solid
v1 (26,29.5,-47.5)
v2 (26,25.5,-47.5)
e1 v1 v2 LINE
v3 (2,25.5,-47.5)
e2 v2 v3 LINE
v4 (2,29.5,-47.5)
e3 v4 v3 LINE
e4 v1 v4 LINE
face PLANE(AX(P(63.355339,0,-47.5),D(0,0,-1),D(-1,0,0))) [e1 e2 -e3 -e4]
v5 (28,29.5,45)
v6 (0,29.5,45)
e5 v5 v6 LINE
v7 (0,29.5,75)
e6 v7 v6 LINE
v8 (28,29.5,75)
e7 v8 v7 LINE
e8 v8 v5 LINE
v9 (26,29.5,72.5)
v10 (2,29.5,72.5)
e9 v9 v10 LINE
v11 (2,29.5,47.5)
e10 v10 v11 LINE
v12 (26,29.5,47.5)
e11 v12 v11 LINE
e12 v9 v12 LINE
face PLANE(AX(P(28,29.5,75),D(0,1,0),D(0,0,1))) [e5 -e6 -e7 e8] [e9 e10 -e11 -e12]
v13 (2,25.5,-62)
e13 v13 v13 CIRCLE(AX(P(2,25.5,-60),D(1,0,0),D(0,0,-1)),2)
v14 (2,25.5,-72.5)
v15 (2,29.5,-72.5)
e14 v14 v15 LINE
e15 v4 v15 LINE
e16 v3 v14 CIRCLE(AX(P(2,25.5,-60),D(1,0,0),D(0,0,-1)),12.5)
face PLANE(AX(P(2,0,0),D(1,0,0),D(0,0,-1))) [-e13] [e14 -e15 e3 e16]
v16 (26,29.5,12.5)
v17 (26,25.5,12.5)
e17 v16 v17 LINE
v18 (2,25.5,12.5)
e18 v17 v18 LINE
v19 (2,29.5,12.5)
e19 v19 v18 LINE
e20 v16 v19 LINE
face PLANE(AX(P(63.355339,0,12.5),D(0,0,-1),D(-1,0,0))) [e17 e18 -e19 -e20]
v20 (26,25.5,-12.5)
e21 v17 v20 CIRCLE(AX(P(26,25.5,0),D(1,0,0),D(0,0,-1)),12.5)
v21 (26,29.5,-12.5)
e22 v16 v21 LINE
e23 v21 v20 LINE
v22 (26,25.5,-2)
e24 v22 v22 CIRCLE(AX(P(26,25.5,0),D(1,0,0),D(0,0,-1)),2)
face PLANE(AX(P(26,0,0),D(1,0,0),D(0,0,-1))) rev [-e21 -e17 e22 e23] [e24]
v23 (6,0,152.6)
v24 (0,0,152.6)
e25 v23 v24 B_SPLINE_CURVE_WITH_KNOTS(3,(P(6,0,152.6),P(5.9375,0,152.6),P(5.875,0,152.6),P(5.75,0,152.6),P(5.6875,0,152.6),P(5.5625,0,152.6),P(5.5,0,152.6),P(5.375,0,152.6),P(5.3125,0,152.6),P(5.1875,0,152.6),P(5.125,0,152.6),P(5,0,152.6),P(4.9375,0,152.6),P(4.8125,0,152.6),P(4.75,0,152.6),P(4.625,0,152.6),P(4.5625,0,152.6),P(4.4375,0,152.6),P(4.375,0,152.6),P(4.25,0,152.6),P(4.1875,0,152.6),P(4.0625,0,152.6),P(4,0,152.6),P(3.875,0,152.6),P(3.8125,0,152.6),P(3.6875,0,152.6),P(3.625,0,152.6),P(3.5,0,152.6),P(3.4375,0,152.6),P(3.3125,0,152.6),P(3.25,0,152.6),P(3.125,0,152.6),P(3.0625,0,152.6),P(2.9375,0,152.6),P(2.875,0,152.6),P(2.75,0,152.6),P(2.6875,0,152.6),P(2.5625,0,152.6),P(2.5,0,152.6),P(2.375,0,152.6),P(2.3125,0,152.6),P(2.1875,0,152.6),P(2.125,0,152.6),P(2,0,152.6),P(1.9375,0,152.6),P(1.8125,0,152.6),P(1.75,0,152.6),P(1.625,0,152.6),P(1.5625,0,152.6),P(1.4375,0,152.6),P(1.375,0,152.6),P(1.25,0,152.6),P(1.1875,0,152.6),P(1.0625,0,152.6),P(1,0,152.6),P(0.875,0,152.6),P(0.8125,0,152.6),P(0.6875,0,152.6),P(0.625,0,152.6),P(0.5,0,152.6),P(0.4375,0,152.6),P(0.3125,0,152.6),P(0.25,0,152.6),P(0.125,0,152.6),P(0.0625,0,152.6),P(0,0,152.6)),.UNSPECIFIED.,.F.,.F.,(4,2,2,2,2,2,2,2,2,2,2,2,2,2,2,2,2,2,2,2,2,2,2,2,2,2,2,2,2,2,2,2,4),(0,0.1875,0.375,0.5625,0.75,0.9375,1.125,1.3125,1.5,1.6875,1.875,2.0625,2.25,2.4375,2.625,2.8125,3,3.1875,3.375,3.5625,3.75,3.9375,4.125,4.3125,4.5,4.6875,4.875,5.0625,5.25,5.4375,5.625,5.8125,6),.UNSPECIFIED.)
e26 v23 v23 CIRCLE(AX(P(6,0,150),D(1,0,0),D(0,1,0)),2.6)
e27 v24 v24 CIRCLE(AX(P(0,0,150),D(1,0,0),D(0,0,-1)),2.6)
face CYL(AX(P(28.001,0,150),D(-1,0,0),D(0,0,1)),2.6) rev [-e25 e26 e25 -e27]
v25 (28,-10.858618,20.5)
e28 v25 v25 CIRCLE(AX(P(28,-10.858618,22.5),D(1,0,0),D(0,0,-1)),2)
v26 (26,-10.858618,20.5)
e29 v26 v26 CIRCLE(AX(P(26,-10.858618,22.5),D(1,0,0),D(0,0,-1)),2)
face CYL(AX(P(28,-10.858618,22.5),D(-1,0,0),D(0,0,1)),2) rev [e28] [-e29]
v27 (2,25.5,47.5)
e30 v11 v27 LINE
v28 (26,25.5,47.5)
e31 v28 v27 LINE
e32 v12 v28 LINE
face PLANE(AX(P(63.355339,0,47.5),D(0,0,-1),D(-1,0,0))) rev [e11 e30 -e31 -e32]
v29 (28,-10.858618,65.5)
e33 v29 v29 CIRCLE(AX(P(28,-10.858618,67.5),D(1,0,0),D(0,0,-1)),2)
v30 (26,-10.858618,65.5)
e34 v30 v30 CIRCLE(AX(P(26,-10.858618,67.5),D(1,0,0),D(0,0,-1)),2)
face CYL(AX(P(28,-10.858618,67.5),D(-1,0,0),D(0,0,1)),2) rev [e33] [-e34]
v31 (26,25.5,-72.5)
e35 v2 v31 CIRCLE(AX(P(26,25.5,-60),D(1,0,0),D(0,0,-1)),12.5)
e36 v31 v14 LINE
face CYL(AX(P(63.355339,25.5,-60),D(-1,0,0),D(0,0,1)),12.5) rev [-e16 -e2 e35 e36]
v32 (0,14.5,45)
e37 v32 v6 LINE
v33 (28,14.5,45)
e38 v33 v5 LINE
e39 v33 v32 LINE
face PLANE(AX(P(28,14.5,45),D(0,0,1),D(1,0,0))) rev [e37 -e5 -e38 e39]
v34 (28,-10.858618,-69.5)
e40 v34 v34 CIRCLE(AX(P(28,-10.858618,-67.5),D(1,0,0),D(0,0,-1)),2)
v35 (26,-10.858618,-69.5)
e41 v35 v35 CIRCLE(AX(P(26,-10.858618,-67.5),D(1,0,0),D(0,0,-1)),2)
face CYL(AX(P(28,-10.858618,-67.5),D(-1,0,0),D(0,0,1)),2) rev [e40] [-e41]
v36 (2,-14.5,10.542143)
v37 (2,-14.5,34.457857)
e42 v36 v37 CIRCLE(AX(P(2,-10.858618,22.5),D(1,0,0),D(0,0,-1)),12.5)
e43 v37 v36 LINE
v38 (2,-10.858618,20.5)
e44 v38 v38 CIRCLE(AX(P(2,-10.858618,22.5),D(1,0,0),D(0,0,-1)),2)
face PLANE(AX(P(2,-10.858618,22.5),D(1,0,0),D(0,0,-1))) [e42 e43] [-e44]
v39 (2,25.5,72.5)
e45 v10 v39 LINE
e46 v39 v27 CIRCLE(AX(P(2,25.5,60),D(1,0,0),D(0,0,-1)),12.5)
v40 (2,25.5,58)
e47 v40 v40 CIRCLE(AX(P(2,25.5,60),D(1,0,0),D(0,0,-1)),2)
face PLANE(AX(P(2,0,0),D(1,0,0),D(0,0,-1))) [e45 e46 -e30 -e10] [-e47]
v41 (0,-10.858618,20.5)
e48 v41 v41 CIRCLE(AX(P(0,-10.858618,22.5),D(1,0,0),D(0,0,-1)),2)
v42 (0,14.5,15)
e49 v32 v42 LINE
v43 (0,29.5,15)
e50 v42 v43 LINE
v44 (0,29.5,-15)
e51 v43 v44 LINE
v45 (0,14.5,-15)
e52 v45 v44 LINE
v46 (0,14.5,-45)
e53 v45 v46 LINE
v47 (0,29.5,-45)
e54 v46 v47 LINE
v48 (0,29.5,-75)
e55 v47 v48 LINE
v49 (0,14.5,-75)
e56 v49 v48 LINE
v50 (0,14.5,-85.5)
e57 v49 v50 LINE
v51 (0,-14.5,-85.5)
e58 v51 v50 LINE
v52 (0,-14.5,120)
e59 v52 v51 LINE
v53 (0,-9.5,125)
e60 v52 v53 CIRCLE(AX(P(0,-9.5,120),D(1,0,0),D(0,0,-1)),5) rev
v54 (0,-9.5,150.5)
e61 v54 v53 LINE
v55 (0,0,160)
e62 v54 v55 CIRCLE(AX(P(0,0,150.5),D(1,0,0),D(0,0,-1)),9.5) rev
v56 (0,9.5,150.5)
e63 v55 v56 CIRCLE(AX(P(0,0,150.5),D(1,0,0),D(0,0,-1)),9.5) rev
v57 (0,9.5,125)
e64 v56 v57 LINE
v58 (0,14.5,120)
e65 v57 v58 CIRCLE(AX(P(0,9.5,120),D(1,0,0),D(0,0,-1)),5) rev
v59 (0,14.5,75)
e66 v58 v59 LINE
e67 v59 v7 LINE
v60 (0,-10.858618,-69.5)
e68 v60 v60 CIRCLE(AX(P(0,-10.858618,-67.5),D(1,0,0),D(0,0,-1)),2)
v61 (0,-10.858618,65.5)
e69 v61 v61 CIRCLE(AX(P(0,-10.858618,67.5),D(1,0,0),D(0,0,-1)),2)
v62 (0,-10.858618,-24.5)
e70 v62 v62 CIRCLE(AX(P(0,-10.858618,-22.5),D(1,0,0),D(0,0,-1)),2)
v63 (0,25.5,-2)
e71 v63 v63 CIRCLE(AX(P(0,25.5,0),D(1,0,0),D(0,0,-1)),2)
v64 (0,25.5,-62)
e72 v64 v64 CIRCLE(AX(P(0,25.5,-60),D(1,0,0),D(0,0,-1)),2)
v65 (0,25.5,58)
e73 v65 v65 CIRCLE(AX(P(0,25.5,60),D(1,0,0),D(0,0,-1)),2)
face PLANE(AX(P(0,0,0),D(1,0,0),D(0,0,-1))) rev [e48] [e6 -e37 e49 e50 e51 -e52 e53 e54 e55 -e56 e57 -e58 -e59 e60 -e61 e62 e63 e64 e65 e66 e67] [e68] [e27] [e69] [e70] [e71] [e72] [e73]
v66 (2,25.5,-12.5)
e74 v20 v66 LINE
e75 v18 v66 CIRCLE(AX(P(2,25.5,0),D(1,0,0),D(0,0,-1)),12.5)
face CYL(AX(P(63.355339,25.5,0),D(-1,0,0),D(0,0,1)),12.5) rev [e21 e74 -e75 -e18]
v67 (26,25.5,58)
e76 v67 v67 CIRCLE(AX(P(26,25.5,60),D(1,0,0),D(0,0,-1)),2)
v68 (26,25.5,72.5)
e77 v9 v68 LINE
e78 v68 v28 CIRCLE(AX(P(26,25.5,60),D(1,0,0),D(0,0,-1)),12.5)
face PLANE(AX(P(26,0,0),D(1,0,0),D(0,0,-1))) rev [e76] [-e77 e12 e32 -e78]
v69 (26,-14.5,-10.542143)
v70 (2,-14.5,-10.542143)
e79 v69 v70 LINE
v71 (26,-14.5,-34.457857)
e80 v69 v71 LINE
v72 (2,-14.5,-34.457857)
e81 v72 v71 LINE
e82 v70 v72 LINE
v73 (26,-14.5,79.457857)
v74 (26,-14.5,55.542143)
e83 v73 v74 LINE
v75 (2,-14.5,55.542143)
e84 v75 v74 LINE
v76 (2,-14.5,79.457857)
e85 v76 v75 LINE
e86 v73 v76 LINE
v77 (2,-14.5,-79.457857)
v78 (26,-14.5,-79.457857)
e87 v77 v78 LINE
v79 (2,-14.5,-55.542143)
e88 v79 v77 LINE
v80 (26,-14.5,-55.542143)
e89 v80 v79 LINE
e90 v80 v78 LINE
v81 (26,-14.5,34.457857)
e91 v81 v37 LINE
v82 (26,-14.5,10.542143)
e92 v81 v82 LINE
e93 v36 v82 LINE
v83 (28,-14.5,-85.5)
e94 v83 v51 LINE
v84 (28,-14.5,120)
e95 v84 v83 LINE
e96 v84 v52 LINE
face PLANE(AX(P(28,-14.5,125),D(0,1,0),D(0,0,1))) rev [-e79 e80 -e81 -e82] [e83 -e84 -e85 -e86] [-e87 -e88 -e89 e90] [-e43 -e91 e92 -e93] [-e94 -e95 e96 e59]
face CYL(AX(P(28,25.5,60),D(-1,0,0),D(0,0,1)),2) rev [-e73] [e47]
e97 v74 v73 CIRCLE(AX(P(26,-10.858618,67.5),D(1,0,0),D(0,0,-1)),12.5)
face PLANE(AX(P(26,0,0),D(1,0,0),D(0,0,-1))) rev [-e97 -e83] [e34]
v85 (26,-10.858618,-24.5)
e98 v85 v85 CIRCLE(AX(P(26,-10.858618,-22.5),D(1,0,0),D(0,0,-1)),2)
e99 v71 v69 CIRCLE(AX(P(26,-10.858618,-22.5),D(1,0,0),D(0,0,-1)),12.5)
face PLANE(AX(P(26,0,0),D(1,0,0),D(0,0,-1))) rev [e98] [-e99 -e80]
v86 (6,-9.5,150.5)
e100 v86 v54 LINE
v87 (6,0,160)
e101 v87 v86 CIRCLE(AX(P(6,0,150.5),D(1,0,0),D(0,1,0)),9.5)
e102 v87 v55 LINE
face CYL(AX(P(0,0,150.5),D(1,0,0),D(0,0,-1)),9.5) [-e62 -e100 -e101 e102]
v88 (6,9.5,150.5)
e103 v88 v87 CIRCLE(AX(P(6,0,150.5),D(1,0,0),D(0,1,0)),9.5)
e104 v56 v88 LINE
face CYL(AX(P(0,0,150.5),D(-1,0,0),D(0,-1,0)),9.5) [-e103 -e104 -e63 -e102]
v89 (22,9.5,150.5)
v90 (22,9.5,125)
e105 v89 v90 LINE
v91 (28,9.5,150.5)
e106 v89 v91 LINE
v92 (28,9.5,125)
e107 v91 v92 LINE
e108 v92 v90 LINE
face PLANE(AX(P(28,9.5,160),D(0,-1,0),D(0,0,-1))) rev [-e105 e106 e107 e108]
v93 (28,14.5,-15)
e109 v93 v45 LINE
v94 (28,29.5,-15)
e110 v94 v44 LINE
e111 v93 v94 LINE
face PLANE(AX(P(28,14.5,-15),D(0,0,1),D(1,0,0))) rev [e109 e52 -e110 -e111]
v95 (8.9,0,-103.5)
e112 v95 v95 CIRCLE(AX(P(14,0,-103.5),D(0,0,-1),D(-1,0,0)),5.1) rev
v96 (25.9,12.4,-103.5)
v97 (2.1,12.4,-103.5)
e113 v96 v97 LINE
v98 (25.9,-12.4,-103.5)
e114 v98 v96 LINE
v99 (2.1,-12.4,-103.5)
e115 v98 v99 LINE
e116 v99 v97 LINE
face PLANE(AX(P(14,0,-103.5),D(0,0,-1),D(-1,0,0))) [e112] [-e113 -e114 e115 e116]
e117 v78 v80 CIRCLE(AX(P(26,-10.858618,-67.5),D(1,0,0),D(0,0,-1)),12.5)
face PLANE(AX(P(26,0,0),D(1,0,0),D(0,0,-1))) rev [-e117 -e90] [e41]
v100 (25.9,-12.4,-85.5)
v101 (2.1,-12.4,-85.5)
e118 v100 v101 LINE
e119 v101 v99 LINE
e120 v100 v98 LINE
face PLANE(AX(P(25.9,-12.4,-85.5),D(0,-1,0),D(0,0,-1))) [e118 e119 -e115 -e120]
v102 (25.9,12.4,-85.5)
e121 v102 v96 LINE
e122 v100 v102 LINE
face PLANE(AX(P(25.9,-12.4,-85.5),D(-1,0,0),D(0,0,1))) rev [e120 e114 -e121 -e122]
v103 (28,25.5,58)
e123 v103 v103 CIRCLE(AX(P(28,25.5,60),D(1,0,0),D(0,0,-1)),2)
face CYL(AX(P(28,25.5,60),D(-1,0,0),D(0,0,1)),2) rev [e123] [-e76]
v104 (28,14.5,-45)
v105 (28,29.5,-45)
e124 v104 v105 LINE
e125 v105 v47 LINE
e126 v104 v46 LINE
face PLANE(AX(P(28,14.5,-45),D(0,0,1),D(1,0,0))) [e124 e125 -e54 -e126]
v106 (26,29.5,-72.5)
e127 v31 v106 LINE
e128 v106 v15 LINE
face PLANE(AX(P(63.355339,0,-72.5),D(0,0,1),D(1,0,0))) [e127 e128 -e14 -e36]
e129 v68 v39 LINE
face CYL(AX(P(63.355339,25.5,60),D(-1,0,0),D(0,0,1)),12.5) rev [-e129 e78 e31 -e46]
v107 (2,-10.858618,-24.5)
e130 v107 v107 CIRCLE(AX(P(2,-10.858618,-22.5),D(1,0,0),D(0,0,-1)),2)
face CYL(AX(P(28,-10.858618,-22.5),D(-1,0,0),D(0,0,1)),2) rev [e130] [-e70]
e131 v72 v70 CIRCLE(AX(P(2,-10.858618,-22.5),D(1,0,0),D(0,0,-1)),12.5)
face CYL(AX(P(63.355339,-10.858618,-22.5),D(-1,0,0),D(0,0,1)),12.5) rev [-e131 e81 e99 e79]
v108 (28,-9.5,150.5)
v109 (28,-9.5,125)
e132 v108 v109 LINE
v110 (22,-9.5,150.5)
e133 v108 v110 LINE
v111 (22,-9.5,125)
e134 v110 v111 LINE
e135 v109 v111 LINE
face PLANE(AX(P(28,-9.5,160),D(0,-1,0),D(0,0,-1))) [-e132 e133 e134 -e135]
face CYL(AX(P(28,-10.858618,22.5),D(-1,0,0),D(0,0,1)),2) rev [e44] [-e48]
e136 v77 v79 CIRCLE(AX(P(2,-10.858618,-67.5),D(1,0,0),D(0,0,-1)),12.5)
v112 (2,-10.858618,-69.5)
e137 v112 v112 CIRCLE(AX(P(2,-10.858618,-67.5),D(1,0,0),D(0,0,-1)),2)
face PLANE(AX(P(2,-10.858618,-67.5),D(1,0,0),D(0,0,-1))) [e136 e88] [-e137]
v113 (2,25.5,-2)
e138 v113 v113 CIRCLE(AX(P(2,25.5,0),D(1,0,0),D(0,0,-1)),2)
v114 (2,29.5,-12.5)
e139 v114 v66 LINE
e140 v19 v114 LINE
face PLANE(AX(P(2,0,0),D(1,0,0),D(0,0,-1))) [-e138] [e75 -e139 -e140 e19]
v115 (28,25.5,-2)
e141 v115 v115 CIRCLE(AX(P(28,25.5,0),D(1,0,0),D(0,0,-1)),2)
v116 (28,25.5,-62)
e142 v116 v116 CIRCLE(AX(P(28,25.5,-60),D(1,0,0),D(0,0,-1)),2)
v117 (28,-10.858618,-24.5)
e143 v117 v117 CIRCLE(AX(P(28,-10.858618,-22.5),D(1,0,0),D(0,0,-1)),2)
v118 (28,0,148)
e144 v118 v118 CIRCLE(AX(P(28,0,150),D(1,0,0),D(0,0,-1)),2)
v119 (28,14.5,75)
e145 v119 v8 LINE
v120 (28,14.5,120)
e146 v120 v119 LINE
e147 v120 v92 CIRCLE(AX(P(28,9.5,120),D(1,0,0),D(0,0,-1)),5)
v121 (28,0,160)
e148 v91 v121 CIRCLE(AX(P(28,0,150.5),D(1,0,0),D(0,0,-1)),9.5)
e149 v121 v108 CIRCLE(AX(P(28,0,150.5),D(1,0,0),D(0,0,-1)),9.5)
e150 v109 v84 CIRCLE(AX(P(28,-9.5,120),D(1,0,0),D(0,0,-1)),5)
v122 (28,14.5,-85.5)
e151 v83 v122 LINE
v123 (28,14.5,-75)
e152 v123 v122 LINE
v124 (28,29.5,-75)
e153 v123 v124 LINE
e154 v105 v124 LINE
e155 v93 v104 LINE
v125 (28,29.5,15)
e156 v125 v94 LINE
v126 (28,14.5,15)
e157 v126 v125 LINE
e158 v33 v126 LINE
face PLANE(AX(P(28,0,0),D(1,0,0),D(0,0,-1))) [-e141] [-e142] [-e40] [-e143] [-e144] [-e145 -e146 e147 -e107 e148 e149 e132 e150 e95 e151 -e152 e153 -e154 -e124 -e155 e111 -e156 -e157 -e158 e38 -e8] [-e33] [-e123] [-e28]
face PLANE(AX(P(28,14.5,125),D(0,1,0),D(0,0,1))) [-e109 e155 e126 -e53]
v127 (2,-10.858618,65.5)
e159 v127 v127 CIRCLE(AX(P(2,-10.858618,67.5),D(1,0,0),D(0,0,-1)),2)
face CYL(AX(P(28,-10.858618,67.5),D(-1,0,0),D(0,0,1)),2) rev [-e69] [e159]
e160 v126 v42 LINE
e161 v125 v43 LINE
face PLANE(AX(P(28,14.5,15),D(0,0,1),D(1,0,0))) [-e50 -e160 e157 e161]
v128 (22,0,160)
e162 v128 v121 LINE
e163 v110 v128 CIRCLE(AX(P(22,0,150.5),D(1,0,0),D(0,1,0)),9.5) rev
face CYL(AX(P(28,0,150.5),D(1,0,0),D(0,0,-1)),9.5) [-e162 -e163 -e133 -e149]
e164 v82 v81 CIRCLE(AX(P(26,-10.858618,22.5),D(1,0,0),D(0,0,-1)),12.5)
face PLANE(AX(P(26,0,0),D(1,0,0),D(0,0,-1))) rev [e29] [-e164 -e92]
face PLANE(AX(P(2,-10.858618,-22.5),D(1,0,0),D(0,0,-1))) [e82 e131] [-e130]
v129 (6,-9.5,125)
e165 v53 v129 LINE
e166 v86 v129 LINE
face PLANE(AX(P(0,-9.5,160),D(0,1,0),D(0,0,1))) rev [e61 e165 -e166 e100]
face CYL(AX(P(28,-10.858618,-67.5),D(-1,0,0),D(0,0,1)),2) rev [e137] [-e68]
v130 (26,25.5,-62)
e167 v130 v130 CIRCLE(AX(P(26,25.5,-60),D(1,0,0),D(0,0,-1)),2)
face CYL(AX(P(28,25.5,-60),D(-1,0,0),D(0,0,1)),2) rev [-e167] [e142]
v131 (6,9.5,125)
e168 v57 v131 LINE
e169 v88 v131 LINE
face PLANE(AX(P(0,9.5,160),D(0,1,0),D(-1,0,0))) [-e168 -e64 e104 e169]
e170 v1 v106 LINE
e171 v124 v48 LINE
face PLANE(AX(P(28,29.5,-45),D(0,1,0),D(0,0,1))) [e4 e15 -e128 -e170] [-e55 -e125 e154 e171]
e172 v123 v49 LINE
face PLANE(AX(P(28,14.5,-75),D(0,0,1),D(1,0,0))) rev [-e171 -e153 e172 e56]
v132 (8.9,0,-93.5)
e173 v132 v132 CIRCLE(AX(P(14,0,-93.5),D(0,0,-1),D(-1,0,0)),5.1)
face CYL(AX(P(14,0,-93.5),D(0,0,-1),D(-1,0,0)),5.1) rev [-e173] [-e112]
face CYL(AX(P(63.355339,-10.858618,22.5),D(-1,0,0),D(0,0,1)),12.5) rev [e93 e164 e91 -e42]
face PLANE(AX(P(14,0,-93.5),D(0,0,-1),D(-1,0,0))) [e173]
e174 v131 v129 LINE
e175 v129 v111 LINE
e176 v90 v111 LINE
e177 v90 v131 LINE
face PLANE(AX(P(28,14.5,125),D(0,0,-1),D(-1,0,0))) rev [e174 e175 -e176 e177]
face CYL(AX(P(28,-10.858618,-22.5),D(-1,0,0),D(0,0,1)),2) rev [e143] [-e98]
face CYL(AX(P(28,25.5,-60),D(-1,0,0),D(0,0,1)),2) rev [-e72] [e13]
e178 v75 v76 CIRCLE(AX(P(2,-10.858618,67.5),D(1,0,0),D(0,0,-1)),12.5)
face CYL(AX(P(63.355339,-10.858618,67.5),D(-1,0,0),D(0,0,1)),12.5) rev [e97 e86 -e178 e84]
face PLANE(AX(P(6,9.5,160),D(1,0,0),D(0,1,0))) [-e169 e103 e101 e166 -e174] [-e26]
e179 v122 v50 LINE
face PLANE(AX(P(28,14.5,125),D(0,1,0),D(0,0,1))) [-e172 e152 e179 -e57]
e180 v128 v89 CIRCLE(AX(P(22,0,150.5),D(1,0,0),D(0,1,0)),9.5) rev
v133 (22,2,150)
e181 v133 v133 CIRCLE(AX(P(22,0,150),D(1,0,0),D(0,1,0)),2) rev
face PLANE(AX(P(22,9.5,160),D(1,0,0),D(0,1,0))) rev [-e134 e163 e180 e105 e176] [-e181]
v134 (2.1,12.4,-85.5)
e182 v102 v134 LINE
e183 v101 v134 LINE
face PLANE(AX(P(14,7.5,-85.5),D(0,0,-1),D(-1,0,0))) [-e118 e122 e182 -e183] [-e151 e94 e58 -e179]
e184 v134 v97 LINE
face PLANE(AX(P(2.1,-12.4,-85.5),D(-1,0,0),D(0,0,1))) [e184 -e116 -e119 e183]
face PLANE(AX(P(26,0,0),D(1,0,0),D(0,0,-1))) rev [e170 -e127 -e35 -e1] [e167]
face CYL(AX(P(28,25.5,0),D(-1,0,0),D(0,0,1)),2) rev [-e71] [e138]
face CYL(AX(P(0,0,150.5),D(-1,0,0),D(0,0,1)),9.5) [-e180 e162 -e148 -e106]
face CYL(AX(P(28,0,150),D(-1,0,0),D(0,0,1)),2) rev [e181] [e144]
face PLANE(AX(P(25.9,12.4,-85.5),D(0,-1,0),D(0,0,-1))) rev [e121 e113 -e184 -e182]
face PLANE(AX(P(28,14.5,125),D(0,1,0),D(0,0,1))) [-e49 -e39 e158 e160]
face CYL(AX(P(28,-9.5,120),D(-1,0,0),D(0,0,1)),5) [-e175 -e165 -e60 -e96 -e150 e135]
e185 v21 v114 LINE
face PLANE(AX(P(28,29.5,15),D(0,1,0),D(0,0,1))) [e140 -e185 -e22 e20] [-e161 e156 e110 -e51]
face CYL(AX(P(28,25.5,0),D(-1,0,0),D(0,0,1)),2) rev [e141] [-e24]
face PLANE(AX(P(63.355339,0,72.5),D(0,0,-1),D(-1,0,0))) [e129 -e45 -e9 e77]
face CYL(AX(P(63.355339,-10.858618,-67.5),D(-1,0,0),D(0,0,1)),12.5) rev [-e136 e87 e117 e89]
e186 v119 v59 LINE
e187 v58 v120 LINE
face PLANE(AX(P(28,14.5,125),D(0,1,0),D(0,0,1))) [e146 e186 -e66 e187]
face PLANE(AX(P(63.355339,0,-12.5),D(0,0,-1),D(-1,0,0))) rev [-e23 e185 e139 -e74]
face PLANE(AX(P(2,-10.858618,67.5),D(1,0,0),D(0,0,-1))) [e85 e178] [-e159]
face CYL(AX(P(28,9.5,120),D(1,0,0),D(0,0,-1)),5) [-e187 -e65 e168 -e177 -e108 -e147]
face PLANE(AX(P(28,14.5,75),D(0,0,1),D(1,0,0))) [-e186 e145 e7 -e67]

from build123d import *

# Parameters (mm, degrees)
SKETCH_1_W           = 250
SKETCH_1_H           = 29
SKETCH_1_W_2         = 30
SKETCH_1_H_2         = 15
EXTRUDE_1_DEPTH      = 28
SKETCH_1_3_R         = 2
CUT_EXTRUDE_1_DEPTH  = 132.450561049
CUT_EXTRUDE_START    = 2
SKETCH_1_5_R         = 2
CUT_EXTRUDE_2_DEPTH  = 24
SKETCH_3_W           = 6
SKETCH_3_H           = 19
EXTRUDE_2_DEPTH      = 35
SKETCH_3_3_W         = 6
SKETCH_3_3_H         = 19
EXTRUDE_3_DEPTH      = 35
SKETCH_1_6_R         = 2
CUT_EXTRUDE_3_DEPTH  = 166.088612569
CUT_EXTRUDE_7_REACH  = 167.089
SKETCH_1_8_R         = 2.6
FILLET_1_R           = 9.5
FILLET_2_R           = 5
SKETCH_4_R           = 5.1
CUT_EXTRUDE_4_DEPTH  = 31.5
SKETCH_4_2_OUTSIDE_W = 87.946
SKETCH_4_2_OUTSIDE_H = 103.946
SKETCH_4_2_OUTSIDE_R = 5.1
CUT_EXTRUDE_5_DEPTH  = 21.5
SKETCH_5_OUTSIDE_W   = 83.722
SKETCH_5_OUTSIDE_H   = 99.722
SKETCH_5_OUTSIDE_W_2 = 23.8
SKETCH_5_OUTSIDE_H_2 = 24.8
CUT_EXTRUDE_6_DEPTH  = 18


with BuildPart() as part:
    # 草图1 → 凸台-拉伸1 (new body)
    with BuildSketch(Plane(origin=(0, 0, 0), x_dir=(0, 0, -1), z_dir=(1, 0, 0))):
        Rectangle(SKETCH_1_W, SKETCH_1_H)
        with Locations((-60, 22)):
            Rectangle(SKETCH_1_W_2, SKETCH_1_H_2)
        with Locations((0, 22)):
            Rectangle(SKETCH_1_W_2, SKETCH_1_H_2)
        with Locations((60, 22)):
            Rectangle(SKETCH_1_W_2, SKETCH_1_H_2)
    extrude(amount=EXTRUDE_1_DEPTH)

    # 草图1<3> → 切除-拉伸1 (cut, through all)
    with BuildSketch(Plane(origin=(0, 0, 0), x_dir=(0, 0, -1), z_dir=(1, 0, 0))):
        with Locations((-67.5, -10.858617882)):
            Circle(SKETCH_1_3_R)
        with Locations((-22.5, -10.858617882)):
            Circle(SKETCH_1_3_R)
        with Locations((22.5, -10.858617882)):
            Circle(SKETCH_1_3_R)
        with Locations((-60, 25.5)):
            Circle(SKETCH_1_3_R)
        with Locations((67.5, -10.858617882)):
            Circle(SKETCH_1_3_R)
        with Locations((0, 25.5)):
            Circle(SKETCH_1_3_R)
        with Locations((60, 25.5)):
            Circle(SKETCH_1_3_R)
    extrude(amount=CUT_EXTRUDE_1_DEPTH, mode=Mode.SUBTRACT)

    # 草图1<5> → 切除-拉伸2 (cut)
    # profile 1 of 7: a face of its own
    with BuildSketch(Plane(origin=(0, 0, 0), x_dir=(0, 0, -1), z_dir=(1, 0, 0)).offset(CUT_EXTRUDE_START)):
        with BuildLine():
            Line((-72.5, 29.5), (-72.5, 25.5))
            ThreePointArc((-72.5, 25.5), (-60, 13), (-47.5, 25.5))
            Line((-47.5, 25.5), (-47.5, 29.5))
            Line((-47.5, 29.5), (-72.5, 29.5))
        make_face()
        with Locations((-60, 25.5)):
            Circle(SKETCH_1_5_R, mode=Mode.SUBTRACT)
    # profile 2 of 7: a face of its own
    with BuildSketch(Plane(origin=(0, 0, 0), x_dir=(0, 0, -1), z_dir=(1, 0, 0)).offset(CUT_EXTRUDE_START)):
        with BuildLine():
            Line((-79.457856675, -14.5), (-55.542143325, -14.5))
            ThreePointArc((-55.542143325, -14.5), (-67.5, 1.641382118), (-79.457856675, -14.5))
        make_face()
        with Locations((-67.5, -10.858617882)):
            Circle(SKETCH_1_5_R, mode=Mode.SUBTRACT)
    # profile 3 of 7: a face of its own
    with BuildSketch(Plane(origin=(0, 0, 0), x_dir=(0, 0, -1), z_dir=(1, 0, 0)).offset(CUT_EXTRUDE_START)):
        with BuildLine():
            Line((-34.457856675, -14.5), (-10.542143325, -14.5))
            ThreePointArc((-10.542143325, -14.5), (-22.5, 1.641382118), (-34.457856675, -14.5))
        make_face()
        with Locations((-22.5, -10.858617882)):
            Circle(SKETCH_1_5_R, mode=Mode.SUBTRACT)
    # profile 4 of 7: a face of its own
    with BuildSketch(Plane(origin=(0, 0, 0), x_dir=(0, 0, -1), z_dir=(1, 0, 0)).offset(CUT_EXTRUDE_START)):
        with BuildLine():
            ThreePointArc((-12.5, 25.5), (0, 13), (12.5, 25.5))
            Line((12.5, 25.5), (12.5, 29.5))
            Line((12.5, 29.5), (-12.5, 29.5))
            Line((-12.5, 29.5), (-12.5, 25.5))
        make_face()
        with Locations((0, 25.5)):
            Circle(SKETCH_1_5_R, mode=Mode.SUBTRACT)
    # profile 5 of 7: a face of its own
    with BuildSketch(Plane(origin=(0, 0, 0), x_dir=(0, 0, -1), z_dir=(1, 0, 0)).offset(CUT_EXTRUDE_START)):
        with BuildLine():
            Line((10.542143325, -14.5), (34.457856675, -14.5))
            ThreePointArc((34.457856675, -14.5), (22.5, 1.641382118), (10.542143325, -14.5))
        make_face()
        with Locations((22.5, -10.858617882)):
            Circle(SKETCH_1_5_R, mode=Mode.SUBTRACT)
    # profile 6 of 7: a face of its own
    with BuildSketch(Plane(origin=(0, 0, 0), x_dir=(0, 0, -1), z_dir=(1, 0, 0)).offset(CUT_EXTRUDE_START)):
        with BuildLine():
            Line((55.542143325, -14.5), (79.457856675, -14.5))
            ThreePointArc((79.457856675, -14.5), (67.5, 1.641382118), (55.542143325, -14.5))
        make_face()
        with Locations((67.5, -10.858617882)):
            Circle(SKETCH_1_5_R, mode=Mode.SUBTRACT)
    # profile 7 of 7: a face of its own
    with BuildSketch(Plane(origin=(0, 0, 0), x_dir=(0, 0, -1), z_dir=(1, 0, 0)).offset(CUT_EXTRUDE_START)):
        with BuildLine():
            ThreePointArc((47.5, 25.5), (60, 13), (72.5, 25.5))
            Line((72.5, 25.5), (72.5, 29.5))
            Line((72.5, 29.5), (47.5, 29.5))
            Line((47.5, 29.5), (47.5, 25.5))
        make_face()
        with Locations((60, 25.5)):
            Circle(SKETCH_1_5_R, mode=Mode.SUBTRACT)
    extrude(amount=CUT_EXTRUDE_2_DEPTH, mode=Mode.SUBTRACT)

    # 草图3 → 凸台-拉伸2 (add)
    with BuildSketch(Plane.XY.offset(125)):
        with Locations((25, 0)):
            Rectangle(SKETCH_3_W, SKETCH_3_H)
    extrude(amount=EXTRUDE_2_DEPTH)

    # 草图3<3> → 凸台-拉伸3 (add)
    with BuildSketch(Plane.XY.offset(125)):
        with Locations((25, 0)):
            Rectangle(SKETCH_3_3_W, SKETCH_3_3_H)
        with Locations((3, 0)):
            Rectangle(SKETCH_3_3_W, SKETCH_3_3_H)
    extrude(amount=EXTRUDE_3_DEPTH)

    # 草图1<6> → 切除-拉伸3 (cut, through all)
    with BuildSketch(Plane(origin=(0, 0, 0), x_dir=(0, 0, -1), z_dir=(1, 0, 0))):
        with Locations(Location((-150, 0, 0), (0, 0, 90))):
            Circle(SKETCH_1_6_R)
    extrude(amount=CUT_EXTRUDE_3_DEPTH, mode=Mode.SUBTRACT)

    # 草图1<8> → 切除-拉伸7 (cut, up to next)
    with BuildSketch(Plane(origin=(0, 0, 0), x_dir=(0, 0, -1), z_dir=(1, 0, 0)), mode=Mode.PRIVATE) as cut_extrude_7_sk1:
        with Locations(Location((-150, 0, 0), (0, 0, 180))):
            Circle(SKETCH_1_8_R)
    cut_extrude_7_tool1 = extrude(cut_extrude_7_sk1.sketch, amount=CUT_EXTRUDE_7_REACH, mode=Mode.PRIVATE) & part.part
    add(cut_extrude_7_tool1.solids().sort_by_distance((0, 0, 150))[0], mode=Mode.SUBTRACT)

    # 圆角1
    fillet_1_edges = [part.edges().sort_by_distance(p)[0] for p in [
        (25, 9.5, 160),
        (25, -9.5, 160),
        (3, -9.5, 160),
        (3, 9.5, 160),
    ]]
    fillet(fillet_1_edges, radius=FILLET_1_R - 0.0001)  # a hair under: the kernel refuses the full size

    # 圆角2
    fillet_2_edges = [part.edges().sort_by_distance(p)[0] for p in [
        (14, -14.5, 125),
        (14, 14.5, 125),
    ]]
    fillet(fillet_2_edges, radius=FILLET_2_R)

    # 草图4 → 切除-拉伸4 (cut)
    with BuildSketch(Plane(origin=(0, 0, -125), x_dir=(-1, 0, 0), z_dir=(0, 0, -1))):
        with Locations((-14, 0)):
            Circle(SKETCH_4_R)
    extrude(amount=-CUT_EXTRUDE_4_DEPTH, mode=Mode.SUBTRACT)

    # 草图4<2> outside → 切除-拉伸5 (cut)
    with BuildSketch(Plane(origin=(0, 0, -125), x_dir=(-1, 0, 0), z_dir=(0, 0, -1))):
        with Locations((-14, 7.5)):
            Rectangle(SKETCH_4_2_OUTSIDE_W, SKETCH_4_2_OUTSIDE_H)
        with Locations((-14, 0)):
            Circle(SKETCH_4_2_OUTSIDE_R, mode=Mode.SUBTRACT)
    extrude(amount=-CUT_EXTRUDE_5_DEPTH, mode=Mode.SUBTRACT)

    # 草图5 outside → 切除-拉伸6 (cut)
    with BuildSketch(Plane(origin=(0, 0, -103.5), x_dir=(-1, 0, 0), z_dir=(0, 0, -1))):
        with Locations((-14, 7.5)):
            Rectangle(SKETCH_5_OUTSIDE_W, SKETCH_5_OUTSIDE_H)
        with Locations((-14, 0)):
            Rectangle(SKETCH_5_OUTSIDE_W_2, SKETCH_5_OUTSIDE_H_2, mode=Mode.SUBTRACT)
    extrude(amount=-CUT_EXTRUDE_6_DEPTH, mode=Mode.SUBTRACT)


solid = part.part
